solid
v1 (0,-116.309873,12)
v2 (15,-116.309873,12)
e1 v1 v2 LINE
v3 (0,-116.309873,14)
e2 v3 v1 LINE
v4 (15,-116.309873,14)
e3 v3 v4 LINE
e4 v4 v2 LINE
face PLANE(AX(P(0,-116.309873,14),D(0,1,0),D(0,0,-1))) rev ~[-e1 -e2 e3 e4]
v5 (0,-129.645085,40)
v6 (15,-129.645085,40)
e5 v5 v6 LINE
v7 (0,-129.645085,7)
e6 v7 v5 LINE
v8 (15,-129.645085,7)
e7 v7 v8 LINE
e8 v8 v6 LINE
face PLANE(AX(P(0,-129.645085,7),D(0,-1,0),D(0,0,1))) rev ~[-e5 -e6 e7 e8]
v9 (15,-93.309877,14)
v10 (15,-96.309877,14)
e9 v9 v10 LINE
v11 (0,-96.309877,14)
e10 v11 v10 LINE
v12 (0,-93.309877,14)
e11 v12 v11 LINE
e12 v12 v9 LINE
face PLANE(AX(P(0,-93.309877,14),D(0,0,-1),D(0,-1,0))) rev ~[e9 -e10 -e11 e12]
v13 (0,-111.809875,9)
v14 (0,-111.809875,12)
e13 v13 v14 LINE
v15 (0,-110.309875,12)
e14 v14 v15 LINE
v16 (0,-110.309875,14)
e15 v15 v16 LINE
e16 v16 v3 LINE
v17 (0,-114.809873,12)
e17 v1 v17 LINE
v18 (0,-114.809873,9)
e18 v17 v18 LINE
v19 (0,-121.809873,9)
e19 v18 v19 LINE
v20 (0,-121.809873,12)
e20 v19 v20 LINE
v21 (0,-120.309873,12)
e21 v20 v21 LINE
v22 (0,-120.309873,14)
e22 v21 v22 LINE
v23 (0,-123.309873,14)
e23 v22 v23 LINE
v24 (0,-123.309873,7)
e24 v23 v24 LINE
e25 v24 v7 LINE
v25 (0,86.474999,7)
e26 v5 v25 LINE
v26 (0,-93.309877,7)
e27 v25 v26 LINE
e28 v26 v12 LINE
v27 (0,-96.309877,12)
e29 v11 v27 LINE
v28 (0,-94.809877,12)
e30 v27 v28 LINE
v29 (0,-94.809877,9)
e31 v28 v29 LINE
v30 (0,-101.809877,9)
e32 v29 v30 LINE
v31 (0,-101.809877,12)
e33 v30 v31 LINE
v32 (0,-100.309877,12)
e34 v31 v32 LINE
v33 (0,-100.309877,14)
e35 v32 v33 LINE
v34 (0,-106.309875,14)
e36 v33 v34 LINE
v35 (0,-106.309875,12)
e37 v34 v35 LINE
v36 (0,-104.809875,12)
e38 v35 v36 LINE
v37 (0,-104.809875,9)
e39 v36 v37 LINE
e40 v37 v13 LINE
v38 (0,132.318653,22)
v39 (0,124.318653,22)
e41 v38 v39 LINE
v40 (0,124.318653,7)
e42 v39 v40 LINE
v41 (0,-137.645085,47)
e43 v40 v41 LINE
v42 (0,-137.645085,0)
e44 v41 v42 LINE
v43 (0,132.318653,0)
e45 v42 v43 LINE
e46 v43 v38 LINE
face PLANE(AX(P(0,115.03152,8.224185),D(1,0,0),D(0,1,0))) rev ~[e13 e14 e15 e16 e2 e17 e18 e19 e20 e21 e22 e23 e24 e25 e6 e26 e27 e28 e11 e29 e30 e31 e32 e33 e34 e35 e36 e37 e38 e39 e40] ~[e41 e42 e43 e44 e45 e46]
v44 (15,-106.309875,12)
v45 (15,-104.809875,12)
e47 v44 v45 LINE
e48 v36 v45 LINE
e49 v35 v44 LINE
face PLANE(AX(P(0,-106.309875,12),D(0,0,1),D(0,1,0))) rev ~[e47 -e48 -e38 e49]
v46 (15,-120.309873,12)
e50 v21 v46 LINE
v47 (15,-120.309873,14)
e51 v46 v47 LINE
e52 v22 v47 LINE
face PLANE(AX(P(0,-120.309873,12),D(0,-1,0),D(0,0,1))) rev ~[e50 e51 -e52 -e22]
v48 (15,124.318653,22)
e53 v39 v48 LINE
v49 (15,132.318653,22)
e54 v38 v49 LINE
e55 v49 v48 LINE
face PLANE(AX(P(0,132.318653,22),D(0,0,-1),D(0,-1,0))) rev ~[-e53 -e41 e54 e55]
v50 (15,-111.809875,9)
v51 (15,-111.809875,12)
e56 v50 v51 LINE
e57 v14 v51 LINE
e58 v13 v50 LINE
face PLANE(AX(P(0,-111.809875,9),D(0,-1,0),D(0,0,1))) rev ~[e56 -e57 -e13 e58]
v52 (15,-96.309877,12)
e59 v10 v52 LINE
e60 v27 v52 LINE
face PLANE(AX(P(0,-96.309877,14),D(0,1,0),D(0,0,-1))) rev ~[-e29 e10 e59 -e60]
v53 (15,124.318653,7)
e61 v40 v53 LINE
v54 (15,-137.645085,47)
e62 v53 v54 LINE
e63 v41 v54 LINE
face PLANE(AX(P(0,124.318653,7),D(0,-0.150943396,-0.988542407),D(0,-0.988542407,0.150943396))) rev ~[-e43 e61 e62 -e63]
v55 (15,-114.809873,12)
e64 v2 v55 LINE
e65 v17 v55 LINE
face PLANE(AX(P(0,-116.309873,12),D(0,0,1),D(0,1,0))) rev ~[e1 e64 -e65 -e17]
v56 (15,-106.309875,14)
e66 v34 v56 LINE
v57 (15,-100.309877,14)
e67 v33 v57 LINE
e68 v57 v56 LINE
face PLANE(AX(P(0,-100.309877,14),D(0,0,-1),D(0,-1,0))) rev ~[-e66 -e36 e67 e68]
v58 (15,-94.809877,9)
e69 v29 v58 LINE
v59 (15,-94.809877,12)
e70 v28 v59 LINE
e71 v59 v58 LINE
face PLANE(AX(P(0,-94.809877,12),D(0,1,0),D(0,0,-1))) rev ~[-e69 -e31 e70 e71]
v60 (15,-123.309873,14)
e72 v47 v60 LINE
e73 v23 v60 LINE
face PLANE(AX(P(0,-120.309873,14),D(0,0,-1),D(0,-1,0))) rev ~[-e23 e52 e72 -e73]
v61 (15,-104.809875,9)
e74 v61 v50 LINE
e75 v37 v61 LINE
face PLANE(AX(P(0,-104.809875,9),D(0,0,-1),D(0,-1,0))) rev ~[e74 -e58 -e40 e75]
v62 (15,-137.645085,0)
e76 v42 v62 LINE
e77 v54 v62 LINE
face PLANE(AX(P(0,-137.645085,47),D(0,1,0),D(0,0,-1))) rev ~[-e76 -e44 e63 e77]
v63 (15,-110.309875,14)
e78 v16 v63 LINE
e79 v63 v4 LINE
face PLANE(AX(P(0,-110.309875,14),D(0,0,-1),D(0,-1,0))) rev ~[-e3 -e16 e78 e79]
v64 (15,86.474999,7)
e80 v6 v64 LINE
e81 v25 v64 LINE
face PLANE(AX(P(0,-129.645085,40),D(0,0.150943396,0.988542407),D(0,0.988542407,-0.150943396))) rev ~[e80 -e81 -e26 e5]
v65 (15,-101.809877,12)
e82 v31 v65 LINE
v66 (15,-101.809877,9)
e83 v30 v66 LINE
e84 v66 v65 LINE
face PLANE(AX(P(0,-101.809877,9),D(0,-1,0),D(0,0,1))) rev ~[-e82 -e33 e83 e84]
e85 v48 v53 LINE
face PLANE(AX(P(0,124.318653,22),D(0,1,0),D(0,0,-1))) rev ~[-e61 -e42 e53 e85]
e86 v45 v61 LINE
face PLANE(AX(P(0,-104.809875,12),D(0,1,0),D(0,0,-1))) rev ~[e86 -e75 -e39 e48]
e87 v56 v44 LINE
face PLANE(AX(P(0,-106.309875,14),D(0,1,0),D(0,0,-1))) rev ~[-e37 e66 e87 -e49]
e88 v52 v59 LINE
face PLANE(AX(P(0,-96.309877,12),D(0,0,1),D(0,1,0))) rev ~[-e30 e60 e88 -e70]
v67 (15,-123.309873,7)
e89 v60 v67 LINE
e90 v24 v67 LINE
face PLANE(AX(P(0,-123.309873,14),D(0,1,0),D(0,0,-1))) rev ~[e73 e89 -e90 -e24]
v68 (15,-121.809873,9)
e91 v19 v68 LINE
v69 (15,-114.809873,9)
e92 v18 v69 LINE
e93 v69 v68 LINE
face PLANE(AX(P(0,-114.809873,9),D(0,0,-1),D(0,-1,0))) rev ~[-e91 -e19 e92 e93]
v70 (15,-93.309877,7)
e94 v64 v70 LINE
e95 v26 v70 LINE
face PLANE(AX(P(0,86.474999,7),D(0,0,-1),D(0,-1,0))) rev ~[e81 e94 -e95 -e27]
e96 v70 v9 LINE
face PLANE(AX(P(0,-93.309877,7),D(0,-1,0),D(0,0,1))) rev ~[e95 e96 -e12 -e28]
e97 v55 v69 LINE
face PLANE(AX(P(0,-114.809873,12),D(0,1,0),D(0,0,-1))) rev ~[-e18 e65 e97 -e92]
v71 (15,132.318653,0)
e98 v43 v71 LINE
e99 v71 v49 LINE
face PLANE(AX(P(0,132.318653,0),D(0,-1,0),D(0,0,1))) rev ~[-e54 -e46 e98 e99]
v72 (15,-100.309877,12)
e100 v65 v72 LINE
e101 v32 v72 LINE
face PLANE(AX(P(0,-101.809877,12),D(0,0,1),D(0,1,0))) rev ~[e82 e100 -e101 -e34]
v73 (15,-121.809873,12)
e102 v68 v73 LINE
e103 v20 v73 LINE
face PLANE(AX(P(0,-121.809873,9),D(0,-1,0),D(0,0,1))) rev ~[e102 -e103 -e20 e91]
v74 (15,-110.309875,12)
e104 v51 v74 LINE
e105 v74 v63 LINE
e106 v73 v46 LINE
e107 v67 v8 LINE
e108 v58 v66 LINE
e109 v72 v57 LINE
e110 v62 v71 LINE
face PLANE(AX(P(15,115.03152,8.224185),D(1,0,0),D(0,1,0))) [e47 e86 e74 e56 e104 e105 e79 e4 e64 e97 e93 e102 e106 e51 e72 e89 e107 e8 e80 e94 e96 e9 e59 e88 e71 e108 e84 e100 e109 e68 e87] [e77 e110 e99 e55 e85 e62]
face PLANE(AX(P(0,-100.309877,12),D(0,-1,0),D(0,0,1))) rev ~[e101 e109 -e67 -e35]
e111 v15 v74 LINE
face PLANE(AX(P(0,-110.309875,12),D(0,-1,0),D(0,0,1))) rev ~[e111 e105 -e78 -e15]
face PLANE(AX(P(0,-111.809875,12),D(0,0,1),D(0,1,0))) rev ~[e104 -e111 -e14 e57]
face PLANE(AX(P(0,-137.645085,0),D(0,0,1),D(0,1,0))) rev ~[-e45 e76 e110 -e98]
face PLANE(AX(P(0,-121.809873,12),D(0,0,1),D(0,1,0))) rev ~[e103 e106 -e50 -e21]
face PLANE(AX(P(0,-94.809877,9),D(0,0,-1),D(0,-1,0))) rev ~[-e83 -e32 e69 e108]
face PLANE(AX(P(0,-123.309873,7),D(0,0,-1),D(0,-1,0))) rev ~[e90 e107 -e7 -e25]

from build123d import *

# Parameters (mm, degrees)
F1_DEPTH = 15


# Not quite as in the source:
# - ends of sketch curves that miss each other by under 0.0002 mm in the source are joined


with BuildPart() as f1:
    # F0 (on Right) → F1 (new body)
    with BuildSketch(Plane.YZ):
        Polygon((86.4749986591, 7), (132.3186528001, 0), (132.3186528001, 22), (124.3186528001, 22), (124.3186528001, 7), align=None)
        Polygon((-129.6450851485, 0), (132.3186528001, 0), (86.4749986591, 7), (-93.3098772168, 7), (-103.3098761737, 7), (-113.3098740876, 7), (-123.3098730445, 7), (-129.6450851485, 7), align=None)
        Polygon((-129.6450851485, 40), (86.4749986591, 7), (124.3186528001, 7), (-137.6450851485, 47), (-137.6450851485, 0), (-129.6450851485, 0), (-129.6450851485, 7), align=None)
        Polygon((-123.3098730445, 14), (-123.3098730445, 7), (-113.3098740876, 7), (-113.3098730445, 14), (-116.3098730445, 14), (-116.3098730445, 12), (-114.8098730445, 12), (-114.8098730445, 9), (-121.8098730445, 9), (-121.8098730445, 12), (-120.3098730445, 12), (-120.3098730445, 14), align=None)
        Polygon((-113.3098740876, 7), (-103.3098761737, 7), (-103.3098751307, 14), (-106.3098751307, 14), (-106.3098751307, 12), (-104.8098751307, 12), (-104.8098751307, 9), (-111.8098751307, 9), (-111.8098751307, 12), (-110.3098751307, 12), (-110.3098751307, 14), (-113.3098751307, 14), align=None)
        Polygon((-103.3098761737, 7), (-93.3098772168, 7), (-93.3098772168, 14), (-96.3098772168, 14), (-96.3098772168, 12), (-94.8098772168, 12), (-94.8098772168, 9), (-101.8098772168, 9), (-101.8098772168, 12), (-100.3098772168, 12), (-100.3098772168, 14), (-103.3098772168, 14), align=None)
    extrude(amount=F1_DEPTH)


solid = f1.part
